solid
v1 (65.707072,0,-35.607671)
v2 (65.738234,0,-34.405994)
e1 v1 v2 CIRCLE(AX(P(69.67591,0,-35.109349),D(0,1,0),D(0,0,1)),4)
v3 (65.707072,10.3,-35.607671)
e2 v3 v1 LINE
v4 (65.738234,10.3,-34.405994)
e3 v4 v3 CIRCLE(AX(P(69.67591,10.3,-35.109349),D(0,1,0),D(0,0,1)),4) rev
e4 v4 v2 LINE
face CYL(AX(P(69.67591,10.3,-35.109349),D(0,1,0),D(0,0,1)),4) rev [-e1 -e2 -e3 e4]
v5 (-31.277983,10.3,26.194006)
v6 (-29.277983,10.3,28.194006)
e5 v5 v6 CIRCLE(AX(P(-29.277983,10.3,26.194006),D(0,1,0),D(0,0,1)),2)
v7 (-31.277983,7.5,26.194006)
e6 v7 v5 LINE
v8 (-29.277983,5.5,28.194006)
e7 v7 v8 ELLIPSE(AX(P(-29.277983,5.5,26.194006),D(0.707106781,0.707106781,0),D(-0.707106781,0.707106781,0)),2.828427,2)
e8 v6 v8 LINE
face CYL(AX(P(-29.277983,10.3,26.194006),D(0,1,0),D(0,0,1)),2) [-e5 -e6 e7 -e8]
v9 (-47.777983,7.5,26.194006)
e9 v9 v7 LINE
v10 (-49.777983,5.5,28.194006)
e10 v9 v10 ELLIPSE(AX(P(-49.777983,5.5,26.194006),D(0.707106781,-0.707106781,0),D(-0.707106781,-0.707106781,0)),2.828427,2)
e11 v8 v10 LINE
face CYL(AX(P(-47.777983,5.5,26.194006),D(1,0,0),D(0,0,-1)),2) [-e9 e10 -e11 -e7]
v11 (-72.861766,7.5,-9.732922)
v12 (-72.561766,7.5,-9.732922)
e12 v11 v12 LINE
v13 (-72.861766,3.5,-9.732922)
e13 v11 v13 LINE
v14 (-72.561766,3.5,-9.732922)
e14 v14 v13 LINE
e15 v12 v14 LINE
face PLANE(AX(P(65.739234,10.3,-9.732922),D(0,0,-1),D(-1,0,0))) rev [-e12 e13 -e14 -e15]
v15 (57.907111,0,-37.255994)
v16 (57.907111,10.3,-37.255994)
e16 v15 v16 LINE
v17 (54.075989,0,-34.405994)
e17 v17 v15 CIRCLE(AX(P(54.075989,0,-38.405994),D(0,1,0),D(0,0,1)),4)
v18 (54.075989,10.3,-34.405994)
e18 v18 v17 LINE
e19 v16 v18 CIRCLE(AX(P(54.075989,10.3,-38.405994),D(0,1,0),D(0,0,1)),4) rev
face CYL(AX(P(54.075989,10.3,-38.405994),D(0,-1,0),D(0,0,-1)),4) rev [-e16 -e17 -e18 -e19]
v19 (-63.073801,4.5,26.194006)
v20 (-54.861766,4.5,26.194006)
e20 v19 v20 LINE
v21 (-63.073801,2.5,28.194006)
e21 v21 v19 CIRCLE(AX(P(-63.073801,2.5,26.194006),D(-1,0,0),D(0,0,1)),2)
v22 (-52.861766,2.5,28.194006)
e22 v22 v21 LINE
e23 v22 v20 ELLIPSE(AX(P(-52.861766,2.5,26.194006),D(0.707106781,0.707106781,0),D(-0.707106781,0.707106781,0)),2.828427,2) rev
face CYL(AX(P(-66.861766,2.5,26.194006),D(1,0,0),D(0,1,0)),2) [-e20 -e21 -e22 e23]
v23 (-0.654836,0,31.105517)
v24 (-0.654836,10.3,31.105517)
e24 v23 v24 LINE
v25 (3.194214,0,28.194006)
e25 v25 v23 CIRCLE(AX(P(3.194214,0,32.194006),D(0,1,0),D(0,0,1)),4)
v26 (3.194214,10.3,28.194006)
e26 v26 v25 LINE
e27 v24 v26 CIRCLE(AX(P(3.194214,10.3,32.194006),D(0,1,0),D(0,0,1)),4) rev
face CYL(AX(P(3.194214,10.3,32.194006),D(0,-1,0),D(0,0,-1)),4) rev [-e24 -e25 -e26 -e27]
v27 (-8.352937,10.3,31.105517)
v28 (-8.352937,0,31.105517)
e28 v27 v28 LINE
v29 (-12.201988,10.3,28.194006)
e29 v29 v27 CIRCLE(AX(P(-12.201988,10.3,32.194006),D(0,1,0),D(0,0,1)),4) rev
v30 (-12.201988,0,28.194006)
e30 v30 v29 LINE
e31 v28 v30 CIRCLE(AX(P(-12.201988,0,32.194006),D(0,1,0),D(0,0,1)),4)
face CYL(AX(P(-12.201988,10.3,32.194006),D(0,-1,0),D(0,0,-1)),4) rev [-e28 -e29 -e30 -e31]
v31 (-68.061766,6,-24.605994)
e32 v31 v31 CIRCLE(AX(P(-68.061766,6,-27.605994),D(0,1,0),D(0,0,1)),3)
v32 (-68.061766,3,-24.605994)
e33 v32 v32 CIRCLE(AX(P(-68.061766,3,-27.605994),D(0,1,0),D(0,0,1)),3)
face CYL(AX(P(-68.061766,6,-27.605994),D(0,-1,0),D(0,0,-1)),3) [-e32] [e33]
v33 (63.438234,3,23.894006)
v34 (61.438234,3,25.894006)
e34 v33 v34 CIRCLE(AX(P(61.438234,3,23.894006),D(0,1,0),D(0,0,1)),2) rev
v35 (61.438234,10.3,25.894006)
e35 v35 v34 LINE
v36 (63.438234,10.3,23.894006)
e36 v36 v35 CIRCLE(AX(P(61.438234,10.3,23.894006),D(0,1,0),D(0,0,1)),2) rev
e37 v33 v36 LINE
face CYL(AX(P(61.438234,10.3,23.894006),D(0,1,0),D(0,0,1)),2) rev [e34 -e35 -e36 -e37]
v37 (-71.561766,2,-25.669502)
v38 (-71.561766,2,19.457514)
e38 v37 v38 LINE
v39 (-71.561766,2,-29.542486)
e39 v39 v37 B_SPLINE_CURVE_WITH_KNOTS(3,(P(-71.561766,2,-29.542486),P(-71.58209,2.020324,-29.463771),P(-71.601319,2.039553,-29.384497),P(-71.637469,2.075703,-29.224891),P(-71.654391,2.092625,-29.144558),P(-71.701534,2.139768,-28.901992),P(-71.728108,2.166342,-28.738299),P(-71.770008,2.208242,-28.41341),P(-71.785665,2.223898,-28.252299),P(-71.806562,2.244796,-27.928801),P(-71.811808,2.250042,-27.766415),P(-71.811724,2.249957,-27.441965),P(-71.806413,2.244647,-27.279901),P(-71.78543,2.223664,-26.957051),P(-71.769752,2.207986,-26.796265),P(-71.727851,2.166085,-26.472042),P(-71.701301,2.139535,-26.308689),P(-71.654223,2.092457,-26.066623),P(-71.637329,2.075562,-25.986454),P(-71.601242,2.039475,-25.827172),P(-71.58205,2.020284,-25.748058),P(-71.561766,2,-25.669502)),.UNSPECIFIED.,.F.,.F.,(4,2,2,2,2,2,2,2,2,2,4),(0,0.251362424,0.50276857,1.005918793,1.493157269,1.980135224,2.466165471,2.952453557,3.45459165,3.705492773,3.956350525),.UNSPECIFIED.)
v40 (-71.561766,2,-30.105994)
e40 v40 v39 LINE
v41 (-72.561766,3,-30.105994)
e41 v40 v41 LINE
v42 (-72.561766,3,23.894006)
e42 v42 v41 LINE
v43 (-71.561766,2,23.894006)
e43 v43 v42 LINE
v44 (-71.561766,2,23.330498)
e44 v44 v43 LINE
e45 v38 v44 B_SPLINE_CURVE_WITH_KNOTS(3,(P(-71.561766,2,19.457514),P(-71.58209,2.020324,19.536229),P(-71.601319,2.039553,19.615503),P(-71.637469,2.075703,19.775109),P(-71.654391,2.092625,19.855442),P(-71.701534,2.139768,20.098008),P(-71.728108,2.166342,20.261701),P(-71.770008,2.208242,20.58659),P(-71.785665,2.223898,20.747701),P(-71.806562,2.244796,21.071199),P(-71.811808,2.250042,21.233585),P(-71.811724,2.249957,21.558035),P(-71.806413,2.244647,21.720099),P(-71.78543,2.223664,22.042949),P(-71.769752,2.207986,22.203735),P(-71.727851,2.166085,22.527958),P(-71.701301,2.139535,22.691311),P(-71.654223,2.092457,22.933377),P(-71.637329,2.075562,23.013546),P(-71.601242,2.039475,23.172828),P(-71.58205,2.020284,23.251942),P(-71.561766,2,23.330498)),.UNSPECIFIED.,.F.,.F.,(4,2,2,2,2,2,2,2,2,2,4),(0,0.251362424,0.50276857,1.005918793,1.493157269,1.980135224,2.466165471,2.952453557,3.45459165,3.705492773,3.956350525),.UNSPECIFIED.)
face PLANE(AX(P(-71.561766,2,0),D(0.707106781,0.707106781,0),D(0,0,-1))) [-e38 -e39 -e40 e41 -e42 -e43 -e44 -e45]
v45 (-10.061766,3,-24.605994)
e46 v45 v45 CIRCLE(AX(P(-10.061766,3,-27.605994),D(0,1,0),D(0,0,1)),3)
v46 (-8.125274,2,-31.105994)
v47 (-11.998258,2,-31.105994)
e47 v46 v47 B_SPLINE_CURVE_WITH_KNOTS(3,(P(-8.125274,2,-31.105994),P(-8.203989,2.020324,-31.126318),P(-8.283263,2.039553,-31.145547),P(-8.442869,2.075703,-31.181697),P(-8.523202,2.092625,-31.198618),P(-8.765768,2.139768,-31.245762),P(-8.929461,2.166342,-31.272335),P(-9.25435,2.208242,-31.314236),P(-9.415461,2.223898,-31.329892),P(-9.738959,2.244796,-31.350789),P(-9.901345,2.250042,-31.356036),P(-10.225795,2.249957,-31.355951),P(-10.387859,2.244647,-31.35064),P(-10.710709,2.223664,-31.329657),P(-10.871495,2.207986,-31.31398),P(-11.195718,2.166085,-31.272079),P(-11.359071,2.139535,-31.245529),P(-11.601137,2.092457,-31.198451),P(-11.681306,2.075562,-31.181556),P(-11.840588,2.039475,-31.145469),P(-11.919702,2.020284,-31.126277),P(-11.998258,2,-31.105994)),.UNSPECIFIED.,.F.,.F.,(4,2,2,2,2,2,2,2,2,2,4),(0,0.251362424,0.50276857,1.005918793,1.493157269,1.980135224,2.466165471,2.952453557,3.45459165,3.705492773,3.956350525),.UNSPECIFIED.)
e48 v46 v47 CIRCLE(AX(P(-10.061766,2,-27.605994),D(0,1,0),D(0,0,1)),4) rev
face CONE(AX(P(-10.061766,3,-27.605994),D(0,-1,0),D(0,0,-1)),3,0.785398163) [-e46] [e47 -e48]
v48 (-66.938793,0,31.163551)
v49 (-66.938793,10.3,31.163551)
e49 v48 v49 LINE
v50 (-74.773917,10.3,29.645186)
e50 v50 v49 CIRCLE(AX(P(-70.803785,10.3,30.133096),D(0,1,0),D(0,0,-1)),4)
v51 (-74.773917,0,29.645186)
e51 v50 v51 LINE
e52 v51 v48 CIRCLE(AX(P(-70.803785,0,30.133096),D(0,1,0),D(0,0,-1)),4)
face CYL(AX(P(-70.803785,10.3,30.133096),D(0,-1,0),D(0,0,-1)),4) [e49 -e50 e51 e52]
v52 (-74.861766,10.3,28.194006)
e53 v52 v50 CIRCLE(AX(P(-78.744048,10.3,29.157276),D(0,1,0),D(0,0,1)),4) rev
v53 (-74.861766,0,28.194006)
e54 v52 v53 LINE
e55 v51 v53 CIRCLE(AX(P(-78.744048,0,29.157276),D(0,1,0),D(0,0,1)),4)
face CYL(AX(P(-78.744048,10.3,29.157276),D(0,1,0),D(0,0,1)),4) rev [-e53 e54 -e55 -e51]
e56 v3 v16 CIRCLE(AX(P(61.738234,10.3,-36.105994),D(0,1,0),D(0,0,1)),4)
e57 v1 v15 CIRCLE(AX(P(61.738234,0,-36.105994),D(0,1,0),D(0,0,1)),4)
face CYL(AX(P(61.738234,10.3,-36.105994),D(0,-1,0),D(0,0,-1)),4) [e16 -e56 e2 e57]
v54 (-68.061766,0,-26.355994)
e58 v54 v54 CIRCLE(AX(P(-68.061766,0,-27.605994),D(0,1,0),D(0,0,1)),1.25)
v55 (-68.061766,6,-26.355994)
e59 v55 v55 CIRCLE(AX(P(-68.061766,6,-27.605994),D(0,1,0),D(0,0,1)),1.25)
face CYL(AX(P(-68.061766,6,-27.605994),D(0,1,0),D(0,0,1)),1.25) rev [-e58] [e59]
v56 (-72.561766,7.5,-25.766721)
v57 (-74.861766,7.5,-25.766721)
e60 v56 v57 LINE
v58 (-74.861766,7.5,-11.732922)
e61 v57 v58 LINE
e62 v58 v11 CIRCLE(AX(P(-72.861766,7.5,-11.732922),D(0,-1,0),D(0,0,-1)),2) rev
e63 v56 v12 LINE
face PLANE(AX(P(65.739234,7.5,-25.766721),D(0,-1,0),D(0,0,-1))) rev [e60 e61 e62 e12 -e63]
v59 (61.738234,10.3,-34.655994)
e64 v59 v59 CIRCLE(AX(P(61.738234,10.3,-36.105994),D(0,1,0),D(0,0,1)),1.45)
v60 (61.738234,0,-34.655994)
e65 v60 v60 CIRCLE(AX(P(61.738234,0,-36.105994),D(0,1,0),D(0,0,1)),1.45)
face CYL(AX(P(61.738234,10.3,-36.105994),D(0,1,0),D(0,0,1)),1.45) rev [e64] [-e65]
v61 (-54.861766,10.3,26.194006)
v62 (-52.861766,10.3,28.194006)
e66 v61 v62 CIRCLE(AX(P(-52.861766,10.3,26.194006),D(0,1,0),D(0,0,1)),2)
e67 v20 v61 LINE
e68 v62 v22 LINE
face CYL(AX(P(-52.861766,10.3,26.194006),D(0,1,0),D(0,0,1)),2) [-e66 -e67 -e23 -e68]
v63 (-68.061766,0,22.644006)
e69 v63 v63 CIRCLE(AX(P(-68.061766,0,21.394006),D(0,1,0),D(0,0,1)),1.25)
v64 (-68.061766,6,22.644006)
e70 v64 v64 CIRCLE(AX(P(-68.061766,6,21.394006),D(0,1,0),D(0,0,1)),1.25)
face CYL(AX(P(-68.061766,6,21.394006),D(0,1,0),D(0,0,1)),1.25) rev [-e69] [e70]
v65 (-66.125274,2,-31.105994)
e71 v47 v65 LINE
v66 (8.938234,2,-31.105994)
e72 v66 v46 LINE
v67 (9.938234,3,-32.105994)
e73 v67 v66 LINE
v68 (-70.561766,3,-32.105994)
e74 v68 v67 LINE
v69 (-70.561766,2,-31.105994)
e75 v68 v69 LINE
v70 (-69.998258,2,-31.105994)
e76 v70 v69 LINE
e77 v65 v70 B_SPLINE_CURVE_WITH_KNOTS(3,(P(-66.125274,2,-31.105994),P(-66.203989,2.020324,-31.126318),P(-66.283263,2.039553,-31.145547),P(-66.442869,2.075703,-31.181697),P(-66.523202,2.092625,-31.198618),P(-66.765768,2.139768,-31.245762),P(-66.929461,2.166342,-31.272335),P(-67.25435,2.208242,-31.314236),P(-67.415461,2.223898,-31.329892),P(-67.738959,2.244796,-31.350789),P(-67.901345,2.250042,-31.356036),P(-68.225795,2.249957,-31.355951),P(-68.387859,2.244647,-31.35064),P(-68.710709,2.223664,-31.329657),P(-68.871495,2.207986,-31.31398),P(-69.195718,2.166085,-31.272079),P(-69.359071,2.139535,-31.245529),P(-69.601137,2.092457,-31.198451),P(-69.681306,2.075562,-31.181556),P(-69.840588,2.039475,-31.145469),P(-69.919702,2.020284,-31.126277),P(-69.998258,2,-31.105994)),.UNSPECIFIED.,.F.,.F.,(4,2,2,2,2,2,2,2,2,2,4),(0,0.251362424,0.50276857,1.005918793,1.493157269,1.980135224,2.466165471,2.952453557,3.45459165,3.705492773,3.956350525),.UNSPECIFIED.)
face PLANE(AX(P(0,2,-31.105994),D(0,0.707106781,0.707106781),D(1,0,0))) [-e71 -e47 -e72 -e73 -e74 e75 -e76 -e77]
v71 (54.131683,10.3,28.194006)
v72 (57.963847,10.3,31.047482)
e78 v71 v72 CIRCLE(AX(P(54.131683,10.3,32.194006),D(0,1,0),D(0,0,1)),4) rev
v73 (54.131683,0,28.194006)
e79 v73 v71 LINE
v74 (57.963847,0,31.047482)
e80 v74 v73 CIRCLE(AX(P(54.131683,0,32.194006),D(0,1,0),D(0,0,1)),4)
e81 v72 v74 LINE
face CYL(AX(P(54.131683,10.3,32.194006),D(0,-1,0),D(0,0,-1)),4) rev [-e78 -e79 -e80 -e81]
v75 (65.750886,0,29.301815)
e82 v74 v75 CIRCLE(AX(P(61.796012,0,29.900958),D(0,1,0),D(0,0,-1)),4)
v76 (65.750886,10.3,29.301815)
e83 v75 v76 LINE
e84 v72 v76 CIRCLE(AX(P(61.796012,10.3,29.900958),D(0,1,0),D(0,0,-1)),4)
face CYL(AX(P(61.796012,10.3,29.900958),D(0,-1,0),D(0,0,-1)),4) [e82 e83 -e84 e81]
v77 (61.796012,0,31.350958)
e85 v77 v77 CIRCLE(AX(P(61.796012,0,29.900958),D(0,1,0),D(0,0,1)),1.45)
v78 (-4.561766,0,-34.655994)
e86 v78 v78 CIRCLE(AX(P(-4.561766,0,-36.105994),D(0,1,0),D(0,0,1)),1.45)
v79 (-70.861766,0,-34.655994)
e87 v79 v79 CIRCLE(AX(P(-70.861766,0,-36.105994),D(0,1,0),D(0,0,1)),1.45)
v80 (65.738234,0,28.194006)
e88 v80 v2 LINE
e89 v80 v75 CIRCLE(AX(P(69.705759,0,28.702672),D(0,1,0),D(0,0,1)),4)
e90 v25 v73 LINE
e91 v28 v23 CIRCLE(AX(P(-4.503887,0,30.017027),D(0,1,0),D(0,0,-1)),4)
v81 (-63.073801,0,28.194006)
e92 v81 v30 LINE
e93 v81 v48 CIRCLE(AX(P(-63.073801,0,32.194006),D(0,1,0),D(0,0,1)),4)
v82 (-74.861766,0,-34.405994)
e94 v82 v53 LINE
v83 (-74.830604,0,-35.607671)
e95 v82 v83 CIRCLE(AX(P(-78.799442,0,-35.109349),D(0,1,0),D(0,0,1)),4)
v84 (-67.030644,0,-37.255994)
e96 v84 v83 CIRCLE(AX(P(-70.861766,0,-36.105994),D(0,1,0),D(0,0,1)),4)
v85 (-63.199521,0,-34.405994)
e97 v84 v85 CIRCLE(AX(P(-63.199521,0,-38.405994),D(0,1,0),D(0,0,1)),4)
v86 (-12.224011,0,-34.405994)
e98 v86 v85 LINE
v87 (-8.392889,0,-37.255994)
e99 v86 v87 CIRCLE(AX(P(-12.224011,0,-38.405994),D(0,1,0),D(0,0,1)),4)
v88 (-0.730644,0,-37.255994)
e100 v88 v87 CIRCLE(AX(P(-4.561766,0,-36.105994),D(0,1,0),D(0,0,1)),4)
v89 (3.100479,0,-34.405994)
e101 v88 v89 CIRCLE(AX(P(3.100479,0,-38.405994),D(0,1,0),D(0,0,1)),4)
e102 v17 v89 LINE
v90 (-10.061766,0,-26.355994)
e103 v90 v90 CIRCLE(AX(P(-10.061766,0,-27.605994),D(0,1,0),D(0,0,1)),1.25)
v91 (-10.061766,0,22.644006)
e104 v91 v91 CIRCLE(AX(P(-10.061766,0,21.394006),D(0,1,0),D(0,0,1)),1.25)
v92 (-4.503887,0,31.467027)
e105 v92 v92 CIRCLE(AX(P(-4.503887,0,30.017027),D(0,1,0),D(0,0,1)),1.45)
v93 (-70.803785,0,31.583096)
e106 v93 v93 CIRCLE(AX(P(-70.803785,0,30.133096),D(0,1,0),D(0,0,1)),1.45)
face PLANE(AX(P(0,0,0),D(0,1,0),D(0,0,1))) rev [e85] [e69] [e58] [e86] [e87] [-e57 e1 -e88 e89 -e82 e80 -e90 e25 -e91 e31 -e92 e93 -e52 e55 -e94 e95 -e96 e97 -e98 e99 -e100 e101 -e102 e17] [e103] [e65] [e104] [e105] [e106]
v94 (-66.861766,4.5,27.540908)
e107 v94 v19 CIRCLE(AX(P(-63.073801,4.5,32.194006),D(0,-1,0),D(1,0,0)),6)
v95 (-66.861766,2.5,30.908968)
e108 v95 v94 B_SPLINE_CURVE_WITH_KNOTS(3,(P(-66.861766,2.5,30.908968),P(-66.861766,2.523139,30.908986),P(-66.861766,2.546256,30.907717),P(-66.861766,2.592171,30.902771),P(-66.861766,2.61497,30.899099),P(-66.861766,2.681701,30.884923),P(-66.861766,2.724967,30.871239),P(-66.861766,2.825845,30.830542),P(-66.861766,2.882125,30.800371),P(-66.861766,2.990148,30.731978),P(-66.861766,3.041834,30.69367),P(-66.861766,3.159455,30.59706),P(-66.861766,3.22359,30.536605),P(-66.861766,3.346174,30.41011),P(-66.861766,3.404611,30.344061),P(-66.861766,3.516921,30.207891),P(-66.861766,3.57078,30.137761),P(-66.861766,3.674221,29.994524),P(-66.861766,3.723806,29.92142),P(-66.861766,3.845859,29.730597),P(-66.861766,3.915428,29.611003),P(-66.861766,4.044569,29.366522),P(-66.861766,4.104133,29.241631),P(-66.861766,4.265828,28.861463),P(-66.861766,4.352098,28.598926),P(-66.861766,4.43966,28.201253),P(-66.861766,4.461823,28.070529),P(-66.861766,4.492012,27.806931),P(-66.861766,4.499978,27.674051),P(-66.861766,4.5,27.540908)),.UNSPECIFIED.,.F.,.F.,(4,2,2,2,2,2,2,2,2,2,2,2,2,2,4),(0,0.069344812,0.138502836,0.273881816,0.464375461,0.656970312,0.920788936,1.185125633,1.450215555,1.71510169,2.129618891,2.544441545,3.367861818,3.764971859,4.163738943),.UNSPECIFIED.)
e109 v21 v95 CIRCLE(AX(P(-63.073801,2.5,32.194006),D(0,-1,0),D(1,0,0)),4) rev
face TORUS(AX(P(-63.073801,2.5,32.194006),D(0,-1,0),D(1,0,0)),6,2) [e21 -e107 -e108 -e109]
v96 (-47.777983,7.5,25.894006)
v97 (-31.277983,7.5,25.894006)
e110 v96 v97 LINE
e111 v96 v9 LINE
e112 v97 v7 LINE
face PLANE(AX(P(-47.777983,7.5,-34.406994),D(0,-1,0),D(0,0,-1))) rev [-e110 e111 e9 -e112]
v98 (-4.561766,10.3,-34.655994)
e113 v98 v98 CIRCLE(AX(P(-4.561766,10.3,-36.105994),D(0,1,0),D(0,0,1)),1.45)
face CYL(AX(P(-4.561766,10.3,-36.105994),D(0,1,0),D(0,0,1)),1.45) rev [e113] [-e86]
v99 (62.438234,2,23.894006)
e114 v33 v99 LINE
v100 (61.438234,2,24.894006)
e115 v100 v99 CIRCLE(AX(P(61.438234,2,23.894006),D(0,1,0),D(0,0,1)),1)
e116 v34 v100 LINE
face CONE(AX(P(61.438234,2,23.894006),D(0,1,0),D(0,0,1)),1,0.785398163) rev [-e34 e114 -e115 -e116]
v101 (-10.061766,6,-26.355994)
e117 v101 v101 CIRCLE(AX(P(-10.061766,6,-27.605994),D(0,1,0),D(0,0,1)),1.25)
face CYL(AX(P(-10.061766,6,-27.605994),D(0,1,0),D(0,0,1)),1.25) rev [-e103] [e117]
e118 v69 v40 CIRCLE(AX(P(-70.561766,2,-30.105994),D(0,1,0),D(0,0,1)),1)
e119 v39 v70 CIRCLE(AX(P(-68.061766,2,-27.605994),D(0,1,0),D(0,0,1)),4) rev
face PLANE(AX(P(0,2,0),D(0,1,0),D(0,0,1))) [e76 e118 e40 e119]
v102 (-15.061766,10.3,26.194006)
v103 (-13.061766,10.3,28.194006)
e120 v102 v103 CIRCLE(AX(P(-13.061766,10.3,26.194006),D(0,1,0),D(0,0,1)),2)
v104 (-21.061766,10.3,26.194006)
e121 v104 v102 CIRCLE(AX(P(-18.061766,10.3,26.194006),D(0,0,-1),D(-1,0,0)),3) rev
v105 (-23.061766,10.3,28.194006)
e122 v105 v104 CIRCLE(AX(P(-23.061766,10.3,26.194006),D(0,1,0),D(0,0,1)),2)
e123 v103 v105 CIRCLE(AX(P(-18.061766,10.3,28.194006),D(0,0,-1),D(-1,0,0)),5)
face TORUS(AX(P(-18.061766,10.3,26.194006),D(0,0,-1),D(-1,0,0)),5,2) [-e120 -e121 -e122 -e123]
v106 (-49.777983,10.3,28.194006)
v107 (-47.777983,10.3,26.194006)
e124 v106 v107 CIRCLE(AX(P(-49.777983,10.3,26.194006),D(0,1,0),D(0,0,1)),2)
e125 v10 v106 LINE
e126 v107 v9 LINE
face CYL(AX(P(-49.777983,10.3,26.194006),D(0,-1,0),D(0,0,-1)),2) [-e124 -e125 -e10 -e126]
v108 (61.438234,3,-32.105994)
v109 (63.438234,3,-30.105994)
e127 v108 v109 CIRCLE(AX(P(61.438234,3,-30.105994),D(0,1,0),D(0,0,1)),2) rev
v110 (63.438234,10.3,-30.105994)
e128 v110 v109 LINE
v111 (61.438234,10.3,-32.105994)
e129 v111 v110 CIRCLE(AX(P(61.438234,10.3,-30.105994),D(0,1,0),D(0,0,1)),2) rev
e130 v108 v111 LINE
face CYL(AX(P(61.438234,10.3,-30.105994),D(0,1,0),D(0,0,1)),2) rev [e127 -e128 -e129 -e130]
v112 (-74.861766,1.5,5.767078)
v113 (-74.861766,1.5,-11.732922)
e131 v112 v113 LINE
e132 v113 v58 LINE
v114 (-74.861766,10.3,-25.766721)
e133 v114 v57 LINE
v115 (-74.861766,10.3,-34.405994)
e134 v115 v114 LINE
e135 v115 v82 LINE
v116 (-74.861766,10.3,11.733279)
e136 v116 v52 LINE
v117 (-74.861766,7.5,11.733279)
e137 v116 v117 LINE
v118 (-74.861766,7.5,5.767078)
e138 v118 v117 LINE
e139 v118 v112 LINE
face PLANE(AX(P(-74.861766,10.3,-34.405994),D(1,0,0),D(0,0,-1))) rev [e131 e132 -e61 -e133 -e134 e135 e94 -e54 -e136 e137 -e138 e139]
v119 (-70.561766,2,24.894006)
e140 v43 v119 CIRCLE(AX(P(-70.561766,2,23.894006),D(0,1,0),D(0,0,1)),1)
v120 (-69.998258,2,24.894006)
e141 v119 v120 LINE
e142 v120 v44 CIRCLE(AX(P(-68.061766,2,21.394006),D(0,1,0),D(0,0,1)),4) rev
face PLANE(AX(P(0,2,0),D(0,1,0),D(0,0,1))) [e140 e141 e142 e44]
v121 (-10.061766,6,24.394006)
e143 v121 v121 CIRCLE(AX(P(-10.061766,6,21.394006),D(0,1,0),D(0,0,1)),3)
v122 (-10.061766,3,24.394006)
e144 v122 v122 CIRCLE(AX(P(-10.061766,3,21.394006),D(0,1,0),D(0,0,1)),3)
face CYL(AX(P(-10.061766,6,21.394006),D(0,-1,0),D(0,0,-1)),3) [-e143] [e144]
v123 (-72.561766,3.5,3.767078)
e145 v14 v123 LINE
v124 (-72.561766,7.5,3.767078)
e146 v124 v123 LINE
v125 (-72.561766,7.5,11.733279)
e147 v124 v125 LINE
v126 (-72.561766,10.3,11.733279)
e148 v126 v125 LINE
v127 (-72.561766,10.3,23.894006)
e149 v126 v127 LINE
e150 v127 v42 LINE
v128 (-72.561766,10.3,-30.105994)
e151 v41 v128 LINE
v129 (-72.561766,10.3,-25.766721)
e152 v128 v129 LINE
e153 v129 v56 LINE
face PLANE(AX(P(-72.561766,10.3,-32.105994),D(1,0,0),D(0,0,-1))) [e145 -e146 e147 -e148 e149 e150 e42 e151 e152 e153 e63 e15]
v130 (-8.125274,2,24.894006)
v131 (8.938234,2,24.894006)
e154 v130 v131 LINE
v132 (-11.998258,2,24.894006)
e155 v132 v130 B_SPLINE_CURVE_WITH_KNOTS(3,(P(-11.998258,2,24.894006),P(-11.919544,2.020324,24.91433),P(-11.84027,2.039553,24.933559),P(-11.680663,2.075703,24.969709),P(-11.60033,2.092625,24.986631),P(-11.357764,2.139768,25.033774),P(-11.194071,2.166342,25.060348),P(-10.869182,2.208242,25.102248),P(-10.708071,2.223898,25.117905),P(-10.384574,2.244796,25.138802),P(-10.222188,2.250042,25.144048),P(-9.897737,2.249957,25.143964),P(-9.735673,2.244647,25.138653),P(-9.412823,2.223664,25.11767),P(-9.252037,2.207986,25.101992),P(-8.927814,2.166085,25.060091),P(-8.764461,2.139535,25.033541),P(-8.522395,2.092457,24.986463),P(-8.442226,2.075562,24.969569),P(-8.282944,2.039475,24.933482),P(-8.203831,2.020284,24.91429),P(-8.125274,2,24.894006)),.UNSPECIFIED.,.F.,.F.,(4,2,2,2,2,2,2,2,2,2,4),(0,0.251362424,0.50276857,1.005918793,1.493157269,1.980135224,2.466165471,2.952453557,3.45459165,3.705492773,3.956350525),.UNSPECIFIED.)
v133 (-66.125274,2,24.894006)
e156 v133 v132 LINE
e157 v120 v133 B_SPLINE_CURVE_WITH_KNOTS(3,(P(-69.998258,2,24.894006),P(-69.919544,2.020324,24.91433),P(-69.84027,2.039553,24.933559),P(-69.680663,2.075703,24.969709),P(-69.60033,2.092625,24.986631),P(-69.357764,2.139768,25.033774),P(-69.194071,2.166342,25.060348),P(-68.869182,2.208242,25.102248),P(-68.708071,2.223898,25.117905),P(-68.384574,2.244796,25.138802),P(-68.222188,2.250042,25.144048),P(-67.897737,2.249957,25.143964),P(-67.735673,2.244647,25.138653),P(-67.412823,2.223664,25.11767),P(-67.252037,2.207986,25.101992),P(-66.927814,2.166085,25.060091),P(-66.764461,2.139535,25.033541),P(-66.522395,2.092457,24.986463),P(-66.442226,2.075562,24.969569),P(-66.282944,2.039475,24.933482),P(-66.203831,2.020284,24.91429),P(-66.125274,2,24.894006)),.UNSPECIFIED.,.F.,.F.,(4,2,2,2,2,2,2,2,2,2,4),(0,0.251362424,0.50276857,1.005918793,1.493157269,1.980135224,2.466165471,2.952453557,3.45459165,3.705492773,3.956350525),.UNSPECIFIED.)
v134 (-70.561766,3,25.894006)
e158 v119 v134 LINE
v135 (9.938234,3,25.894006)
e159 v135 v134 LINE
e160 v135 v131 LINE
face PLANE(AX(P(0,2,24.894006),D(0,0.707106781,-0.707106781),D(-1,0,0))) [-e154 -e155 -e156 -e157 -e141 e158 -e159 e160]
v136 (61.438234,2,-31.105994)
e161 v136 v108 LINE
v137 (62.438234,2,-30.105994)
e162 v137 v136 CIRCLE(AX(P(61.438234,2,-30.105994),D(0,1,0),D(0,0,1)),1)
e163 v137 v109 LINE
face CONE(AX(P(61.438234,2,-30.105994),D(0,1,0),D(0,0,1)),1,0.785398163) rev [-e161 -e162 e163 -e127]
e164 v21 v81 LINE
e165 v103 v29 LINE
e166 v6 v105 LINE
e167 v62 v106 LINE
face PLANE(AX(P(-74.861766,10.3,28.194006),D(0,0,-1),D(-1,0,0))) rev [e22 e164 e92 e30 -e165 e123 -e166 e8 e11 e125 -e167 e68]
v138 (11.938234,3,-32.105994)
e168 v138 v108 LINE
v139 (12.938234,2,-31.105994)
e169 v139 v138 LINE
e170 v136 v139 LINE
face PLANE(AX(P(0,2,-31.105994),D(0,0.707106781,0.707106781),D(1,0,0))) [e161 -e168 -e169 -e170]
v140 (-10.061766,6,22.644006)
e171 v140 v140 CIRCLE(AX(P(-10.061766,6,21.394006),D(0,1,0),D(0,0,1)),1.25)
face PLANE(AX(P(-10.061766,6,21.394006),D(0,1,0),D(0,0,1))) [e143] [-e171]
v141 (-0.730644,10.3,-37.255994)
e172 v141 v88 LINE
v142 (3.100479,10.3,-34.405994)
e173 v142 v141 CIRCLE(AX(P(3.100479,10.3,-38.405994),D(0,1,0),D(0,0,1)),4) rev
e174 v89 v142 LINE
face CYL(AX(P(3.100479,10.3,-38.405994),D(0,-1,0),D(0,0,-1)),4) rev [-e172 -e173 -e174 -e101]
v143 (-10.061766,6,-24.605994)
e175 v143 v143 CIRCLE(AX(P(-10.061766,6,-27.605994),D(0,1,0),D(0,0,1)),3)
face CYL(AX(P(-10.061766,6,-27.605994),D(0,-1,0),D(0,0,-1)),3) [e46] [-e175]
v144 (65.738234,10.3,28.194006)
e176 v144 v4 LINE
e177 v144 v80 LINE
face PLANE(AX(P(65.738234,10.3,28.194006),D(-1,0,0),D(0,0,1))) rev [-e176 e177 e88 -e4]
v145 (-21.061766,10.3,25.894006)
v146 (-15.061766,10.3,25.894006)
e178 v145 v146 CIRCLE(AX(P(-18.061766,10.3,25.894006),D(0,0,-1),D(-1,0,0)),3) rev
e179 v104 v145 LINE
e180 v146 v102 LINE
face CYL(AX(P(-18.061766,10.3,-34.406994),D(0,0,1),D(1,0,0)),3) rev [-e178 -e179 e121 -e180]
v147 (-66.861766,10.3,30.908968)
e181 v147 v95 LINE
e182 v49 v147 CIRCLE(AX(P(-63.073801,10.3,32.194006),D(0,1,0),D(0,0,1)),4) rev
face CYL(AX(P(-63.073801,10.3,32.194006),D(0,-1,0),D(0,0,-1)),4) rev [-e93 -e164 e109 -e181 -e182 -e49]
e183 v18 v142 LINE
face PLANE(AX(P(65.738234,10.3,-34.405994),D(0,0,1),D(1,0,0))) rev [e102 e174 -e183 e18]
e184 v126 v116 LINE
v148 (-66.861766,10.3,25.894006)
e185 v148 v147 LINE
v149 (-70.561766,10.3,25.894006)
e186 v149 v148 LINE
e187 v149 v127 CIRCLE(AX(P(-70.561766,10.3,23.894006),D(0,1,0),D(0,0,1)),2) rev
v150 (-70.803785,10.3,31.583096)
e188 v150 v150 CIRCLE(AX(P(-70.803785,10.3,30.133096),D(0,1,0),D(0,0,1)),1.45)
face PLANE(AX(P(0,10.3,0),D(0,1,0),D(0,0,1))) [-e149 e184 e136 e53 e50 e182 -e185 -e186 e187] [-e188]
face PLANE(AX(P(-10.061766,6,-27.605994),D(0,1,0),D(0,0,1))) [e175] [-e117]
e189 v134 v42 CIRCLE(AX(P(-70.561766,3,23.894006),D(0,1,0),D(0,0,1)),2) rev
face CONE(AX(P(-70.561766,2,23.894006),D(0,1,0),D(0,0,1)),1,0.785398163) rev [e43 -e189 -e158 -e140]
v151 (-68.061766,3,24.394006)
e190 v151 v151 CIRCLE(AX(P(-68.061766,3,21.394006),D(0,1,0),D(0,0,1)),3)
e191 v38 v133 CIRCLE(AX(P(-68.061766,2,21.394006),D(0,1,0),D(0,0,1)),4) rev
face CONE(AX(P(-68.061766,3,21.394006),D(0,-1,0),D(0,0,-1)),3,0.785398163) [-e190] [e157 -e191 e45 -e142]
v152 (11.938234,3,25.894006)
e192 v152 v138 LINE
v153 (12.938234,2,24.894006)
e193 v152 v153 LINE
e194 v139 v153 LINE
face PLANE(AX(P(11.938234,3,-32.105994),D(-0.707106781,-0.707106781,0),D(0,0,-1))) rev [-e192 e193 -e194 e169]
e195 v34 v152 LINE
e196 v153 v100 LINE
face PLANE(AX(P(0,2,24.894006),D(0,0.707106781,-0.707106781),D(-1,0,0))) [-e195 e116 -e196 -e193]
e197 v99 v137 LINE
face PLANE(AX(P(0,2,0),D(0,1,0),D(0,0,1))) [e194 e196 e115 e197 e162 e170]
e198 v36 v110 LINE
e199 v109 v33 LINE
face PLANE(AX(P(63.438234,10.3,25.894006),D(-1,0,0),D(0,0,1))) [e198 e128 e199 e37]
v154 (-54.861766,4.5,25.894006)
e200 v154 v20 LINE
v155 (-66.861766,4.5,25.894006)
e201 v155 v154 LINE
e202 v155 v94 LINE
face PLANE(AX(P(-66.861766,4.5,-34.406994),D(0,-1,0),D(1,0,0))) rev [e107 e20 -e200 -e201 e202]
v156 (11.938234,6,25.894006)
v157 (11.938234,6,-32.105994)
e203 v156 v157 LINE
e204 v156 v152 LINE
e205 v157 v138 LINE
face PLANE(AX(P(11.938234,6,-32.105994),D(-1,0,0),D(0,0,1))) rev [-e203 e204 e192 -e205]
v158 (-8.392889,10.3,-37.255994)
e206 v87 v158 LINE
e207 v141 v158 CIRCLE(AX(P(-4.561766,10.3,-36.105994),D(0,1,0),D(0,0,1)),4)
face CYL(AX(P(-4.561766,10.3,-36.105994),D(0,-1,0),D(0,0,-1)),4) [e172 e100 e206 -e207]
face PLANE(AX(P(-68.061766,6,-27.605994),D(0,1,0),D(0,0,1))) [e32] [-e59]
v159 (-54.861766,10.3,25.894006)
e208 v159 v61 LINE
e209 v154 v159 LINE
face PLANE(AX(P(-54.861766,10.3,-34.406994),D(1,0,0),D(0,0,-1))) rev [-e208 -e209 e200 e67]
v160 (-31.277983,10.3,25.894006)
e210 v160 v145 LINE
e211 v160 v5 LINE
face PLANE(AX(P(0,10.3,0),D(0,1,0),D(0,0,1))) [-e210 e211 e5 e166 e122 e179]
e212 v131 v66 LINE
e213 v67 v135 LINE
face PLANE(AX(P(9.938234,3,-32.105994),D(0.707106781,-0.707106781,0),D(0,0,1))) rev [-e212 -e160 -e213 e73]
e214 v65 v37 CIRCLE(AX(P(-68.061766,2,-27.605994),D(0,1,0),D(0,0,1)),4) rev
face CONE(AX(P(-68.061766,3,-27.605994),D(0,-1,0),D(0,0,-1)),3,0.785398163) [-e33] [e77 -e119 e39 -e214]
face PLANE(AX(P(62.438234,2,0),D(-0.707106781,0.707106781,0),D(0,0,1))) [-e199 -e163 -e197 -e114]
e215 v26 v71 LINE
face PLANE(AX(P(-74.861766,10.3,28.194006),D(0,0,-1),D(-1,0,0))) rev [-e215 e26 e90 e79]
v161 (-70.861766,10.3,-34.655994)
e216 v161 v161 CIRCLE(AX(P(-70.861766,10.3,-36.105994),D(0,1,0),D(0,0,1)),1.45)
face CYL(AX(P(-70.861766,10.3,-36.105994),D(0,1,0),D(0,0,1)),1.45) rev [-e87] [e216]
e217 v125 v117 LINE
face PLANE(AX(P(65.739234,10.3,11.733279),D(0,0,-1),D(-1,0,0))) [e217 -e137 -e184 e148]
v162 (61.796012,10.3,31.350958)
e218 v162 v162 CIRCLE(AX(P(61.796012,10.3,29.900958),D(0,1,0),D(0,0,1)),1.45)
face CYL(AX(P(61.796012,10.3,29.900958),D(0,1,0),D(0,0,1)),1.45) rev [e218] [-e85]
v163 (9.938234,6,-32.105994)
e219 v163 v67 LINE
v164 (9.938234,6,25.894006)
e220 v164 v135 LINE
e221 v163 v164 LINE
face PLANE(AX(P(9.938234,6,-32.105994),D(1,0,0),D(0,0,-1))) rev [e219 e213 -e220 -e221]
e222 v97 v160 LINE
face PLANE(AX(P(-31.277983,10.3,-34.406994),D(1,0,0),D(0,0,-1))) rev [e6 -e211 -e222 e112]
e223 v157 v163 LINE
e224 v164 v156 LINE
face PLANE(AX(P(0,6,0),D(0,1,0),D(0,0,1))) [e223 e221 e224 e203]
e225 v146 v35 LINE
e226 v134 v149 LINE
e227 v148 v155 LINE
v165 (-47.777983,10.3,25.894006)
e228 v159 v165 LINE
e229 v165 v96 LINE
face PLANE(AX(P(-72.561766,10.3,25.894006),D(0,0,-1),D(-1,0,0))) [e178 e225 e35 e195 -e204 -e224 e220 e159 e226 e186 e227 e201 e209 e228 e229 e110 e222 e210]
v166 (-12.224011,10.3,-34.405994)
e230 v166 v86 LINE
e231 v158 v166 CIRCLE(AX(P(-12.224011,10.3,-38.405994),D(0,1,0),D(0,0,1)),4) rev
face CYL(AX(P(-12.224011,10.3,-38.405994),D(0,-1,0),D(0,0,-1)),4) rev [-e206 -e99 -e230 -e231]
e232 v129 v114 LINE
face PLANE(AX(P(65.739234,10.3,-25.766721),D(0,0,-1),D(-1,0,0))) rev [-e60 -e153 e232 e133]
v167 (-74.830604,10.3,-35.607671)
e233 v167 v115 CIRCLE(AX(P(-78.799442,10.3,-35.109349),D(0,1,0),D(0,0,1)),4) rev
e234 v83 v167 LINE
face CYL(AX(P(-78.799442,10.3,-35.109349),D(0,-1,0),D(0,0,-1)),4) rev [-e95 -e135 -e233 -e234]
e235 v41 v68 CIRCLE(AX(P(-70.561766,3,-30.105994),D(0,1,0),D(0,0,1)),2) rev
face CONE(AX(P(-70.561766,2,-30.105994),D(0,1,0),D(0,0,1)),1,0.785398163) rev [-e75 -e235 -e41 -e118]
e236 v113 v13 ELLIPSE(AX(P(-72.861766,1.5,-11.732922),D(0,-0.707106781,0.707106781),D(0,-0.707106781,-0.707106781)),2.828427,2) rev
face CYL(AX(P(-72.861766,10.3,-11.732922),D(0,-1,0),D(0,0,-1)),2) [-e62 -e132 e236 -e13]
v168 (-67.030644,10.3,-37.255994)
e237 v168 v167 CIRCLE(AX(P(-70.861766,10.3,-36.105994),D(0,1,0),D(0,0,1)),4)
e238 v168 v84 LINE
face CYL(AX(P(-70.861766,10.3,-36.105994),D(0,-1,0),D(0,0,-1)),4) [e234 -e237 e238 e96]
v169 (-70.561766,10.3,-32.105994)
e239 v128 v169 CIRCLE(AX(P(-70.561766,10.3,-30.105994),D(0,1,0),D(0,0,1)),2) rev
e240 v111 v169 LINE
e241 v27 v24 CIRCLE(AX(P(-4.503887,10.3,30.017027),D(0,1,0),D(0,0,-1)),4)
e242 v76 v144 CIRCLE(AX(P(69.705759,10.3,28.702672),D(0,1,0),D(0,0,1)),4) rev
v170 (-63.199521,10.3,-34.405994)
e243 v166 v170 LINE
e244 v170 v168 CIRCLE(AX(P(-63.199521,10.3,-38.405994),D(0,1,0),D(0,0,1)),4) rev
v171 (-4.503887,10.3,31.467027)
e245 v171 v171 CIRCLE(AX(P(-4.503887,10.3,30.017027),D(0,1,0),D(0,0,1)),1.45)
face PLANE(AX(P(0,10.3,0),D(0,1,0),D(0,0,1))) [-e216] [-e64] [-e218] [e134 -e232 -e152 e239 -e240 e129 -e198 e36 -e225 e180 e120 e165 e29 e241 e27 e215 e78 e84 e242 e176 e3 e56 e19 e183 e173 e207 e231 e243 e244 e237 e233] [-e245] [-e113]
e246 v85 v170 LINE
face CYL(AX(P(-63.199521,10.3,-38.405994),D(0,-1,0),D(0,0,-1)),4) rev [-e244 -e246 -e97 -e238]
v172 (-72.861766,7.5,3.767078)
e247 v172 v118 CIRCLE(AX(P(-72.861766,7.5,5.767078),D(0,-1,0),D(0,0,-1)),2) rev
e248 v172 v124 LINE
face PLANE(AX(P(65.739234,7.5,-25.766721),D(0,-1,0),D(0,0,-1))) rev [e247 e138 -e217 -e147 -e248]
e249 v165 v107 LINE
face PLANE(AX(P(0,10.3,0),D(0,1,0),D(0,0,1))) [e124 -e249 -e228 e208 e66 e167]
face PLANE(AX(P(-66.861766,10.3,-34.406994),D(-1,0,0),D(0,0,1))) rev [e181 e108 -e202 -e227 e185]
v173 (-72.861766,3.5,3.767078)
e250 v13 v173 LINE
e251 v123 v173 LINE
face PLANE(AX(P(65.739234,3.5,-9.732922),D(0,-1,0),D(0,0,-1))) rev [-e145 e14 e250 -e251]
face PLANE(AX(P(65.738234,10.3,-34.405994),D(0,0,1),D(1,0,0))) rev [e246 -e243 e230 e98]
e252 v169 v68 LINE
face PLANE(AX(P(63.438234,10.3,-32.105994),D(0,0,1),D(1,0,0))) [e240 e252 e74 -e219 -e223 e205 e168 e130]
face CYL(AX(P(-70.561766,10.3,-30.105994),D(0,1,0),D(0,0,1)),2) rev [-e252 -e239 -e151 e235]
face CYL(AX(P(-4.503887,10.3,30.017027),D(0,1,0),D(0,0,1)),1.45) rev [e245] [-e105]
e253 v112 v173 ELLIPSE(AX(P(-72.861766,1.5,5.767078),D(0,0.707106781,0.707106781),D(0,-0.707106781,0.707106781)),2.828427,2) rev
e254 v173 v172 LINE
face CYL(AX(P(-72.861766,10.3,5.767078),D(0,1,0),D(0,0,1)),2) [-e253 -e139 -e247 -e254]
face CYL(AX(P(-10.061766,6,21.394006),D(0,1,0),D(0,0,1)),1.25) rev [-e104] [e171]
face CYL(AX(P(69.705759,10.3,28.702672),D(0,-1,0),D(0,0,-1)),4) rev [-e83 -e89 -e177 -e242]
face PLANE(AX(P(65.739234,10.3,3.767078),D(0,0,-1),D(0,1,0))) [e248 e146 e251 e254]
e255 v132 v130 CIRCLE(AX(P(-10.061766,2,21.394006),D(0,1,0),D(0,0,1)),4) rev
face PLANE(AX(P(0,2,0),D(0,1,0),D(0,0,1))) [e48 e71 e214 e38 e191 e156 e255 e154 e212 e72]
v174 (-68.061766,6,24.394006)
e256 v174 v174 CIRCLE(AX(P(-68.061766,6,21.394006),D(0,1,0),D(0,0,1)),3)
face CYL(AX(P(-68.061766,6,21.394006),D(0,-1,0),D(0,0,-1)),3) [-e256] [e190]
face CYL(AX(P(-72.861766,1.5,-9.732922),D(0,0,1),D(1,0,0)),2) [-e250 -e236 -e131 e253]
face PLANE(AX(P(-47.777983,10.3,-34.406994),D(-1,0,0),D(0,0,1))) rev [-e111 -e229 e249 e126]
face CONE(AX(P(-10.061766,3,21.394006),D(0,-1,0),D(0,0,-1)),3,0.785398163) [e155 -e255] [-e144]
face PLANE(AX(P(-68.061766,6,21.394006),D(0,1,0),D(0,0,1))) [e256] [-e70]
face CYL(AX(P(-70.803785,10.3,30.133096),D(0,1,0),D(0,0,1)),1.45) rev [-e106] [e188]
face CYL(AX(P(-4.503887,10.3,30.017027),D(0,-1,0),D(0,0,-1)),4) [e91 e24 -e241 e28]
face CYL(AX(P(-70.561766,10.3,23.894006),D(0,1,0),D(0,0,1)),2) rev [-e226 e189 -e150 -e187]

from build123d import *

# Parameters (mm, degrees)
SKETCH3_W                      = 140.6
SKETCH3_H                      = 62.6
SKETCH3_W_2                    = 136
SKETCH3_H_2                    = 58
BOSS_EXTRUDE1_DEPTH            = 10.3
SKETCH5_W                      = 136
SKETCH5_H                      = 58
BOSS_EXTRUDE2_DEPTH            = 2
SKETCH6_R                      = 3
BOSS_EXTRUDE3_DEPTH            = 4
F_2_5_2_5_DIAMETER_HOLE1_D     = 2.5
F_2_5_2_5_DIAMETER_HOLE1_DEPTH = 8
F_2_5_2_5_DIAMETER_HOLE1_TIP   = 0.751075774
SKETCH10_W                     = 2
SKETCH10_H                     = 58
BOSS_EXTRUDE4_DEPTH            = 4
CUT_EXTRUDE1_REACH             = 100.128
SKETCH11_R                     = 3
SKETCH11_W                     = 12
SKETCH11_H                     = 5.8
SKETCH11_W_2                   = 16.5
SKETCH11_H_2                   = 2.8
CUT_EXTRUDE2_REACH             = 147.115
SKETCH12_W                     = 13.5
SKETCH12_H                     = 6.8
SKETCH12_W_2                   = 37.5
SKETCH12_H_2                   = 2.8
SKETCH13_R                     = 4
BOSS_EXTRUDE5_DEPTH            = 10.3
FILLET2_R                      = 4
FILLET3_R                      = 4
FILLET4_R                      = 4
F_2_9_2_9_DIAMETER_HOLE1_D     = 2.9
FILLET6_R                      = 2
FILLET7_R                      = 2
FILLET8_R                      = 2
CHAMFER1_SIZE                  = 1
CHAMFER2_SIZE                  = 1
FILLET9_R                      = 2


with BuildPart() as part:
    # Sketch3 → Boss-Extrude1 (new body)
    with BuildSketch(Plane(origin=(0, 0, 0), x_dir=(1, 0, 0), z_dir=(0, 1, 0))):
        with Locations((-4.561766162, 3.105993834)):
            Rectangle(SKETCH3_W, SKETCH3_H)
        with Locations((-4.561766162, 3.105993834)):
            Rectangle(SKETCH3_W_2, SKETCH3_H_2, mode=Mode.SUBTRACT)
    extrude(amount=BOSS_EXTRUDE1_DEPTH)

    # Sketch5 → Boss-Extrude2 (add)
    with BuildSketch(Plane(origin=(0, 0, 0), x_dir=(1, 0, 0), z_dir=(0, 1, 0))):
        with Locations((-4.561766162, 3.105993834)):
            Rectangle(SKETCH5_W, SKETCH5_H)
    extrude(amount=BOSS_EXTRUDE2_DEPTH)

    # Sketch6 → Boss-Extrude3 (add)
    with BuildSketch(Plane(origin=(0, 2, 0), x_dir=(1, 0, 0), z_dir=(0, 1, 0))):
        with Locations(Location((-68.061766162, 27.605993834, 0), (0, 0, 270))):
            Circle(SKETCH6_R)
        with Locations(Location((-68.061766162, -21.394006166, 0), (0, 0, 270))):
            Circle(SKETCH6_R)
        with Locations(Location((-10.061766162, -21.394006166, 0), (0, 0, 270))):
            Circle(SKETCH6_R)
        with Locations(Location((-10.061766162, 27.605993834, 0), (0, 0, 270))):
            Circle(SKETCH6_R)
    extrude(amount=BOSS_EXTRUDE3_DEPTH)

    # Ø2.5 (2.5) Diameter Hole1
    with Locations(Plane(origin=(0, 6, 0), x_dir=(1, 0, 0), z_dir=(0, 1, 0))):
        with Locations((-68.061766162, 27.605993834), (-10.061766162, 27.605993834), (-10.061766162, -21.394006166), (-68.061766162, -21.394006166)):
            Hole(F_2_5_2_5_DIAMETER_HOLE1_D / 2, depth=F_2_5_2_5_DIAMETER_HOLE1_DEPTH)
            with Locations((0, 0, -(F_2_5_2_5_DIAMETER_HOLE1_DEPTH + F_2_5_2_5_DIAMETER_HOLE1_TIP / 2))):  # 118° drill point
                Cone(0, F_2_5_2_5_DIAMETER_HOLE1_D / 2, F_2_5_2_5_DIAMETER_HOLE1_TIP, mode=Mode.SUBTRACT)

    # Sketch10 → Boss-Extrude4 (add)
    with BuildSketch(Plane(origin=(0, 2, 0), x_dir=(1, 0, 0), z_dir=(0, 1, 0))):
        with Locations((10.938233838, 3.105993834)):
            Rectangle(SKETCH10_W, SKETCH10_H)
    extrude(amount=BOSS_EXTRUDE4_DEPTH)

    # Sketch11 → Cut-Extrude1 (cut, up to next)
    with BuildSketch(Plane.XY.offset(28.194006166), mode=Mode.PRIVATE) as cut_extrude1_sk1:
        with Locations((-18.061766162, 10.3)):
            Circle(SKETCH11_R)
    cut_extrude1_tool1 = extrude(cut_extrude1_sk1.sketch, amount=-CUT_EXTRUDE1_REACH, mode=Mode.PRIVATE) & part.part
    # Sketch11 → Cut-Extrude1 (cut, up to next)
    with BuildSketch(Plane.XY.offset(28.194006166), mode=Mode.PRIVATE) as cut_extrude1_sk2:
        with Locations((-60.861766162, 7.4)):
            Rectangle(SKETCH11_W, SKETCH11_H)
    cut_extrude1_tool2 = extrude(cut_extrude1_sk2.sketch, amount=-CUT_EXTRUDE1_REACH, mode=Mode.PRIVATE) & part.part
    # Sketch11 → Cut-Extrude1 (cut, up to next)
    with BuildSketch(Plane.XY.offset(28.194006166), mode=Mode.PRIVATE) as cut_extrude1_sk3:
        with Locations((-39.527982648, 8.9)):
            Rectangle(SKETCH11_W_2, SKETCH11_H_2)
    cut_extrude1_tool3 = extrude(cut_extrude1_sk3.sketch, amount=-CUT_EXTRUDE1_REACH, mode=Mode.PRIVATE) & part.part
    add(cut_extrude1_tool1.solids().sort_by_distance((-18.061766, 10.3, 28.194006))[0], mode=Mode.SUBTRACT)
    add(cut_extrude1_tool2.solids().sort_by_distance((-60.861766, 7.4, 28.194006))[0], mode=Mode.SUBTRACT)
    add(cut_extrude1_tool3.solids().sort_by_distance((-39.527983, 8.9, 28.194006))[0], mode=Mode.SUBTRACT)

    # Sketch12 → Cut-Extrude2 (cut, up to next)
    with BuildSketch(Plane.ZY.offset(74.861766162), mode=Mode.PRIVATE) as cut_extrude2_sk1:
        with Locations((-2.982922372, 6.9)):
            Rectangle(SKETCH12_W, SKETCH12_H)
    cut_extrude2_tool1 = extrude(cut_extrude2_sk1.sketch, amount=-CUT_EXTRUDE2_REACH, mode=Mode.PRIVATE) & part.part
    # Sketch12 → Cut-Extrude2 (cut, up to next)
    with BuildSketch(Plane.ZY.offset(74.861766162), mode=Mode.PRIVATE) as cut_extrude2_sk2:
        with Locations((-7.016720831, 8.9)):
            Rectangle(SKETCH12_W_2, SKETCH12_H_2)
    cut_extrude2_tool2 = extrude(cut_extrude2_sk2.sketch, amount=-CUT_EXTRUDE2_REACH, mode=Mode.PRIVATE) & part.part
    add(cut_extrude2_tool1.solids().sort_by_distance((-74.861766, 6.9, -2.982922))[0], mode=Mode.SUBTRACT)
    add(cut_extrude2_tool2.solids().sort_by_distance((-74.861766, 8.9, -7.016721))[0], mode=Mode.SUBTRACT)

    # Sketch13 → Boss-Extrude5 (add)
    with BuildSketch(Plane(origin=(0, 0, 0), x_dir=(1, 0, 0), z_dir=(0, 1, 0))):
        with Locations((-70.861766162, 36.105993834)):
            Circle(SKETCH13_R)
        with Locations((-4.561766162, 36.105993834)):
            Circle(SKETCH13_R)
        with Locations((61.738233838, 36.105993834)):
            Circle(SKETCH13_R)
        with Locations((61.796011733, -29.900958235)):
            Circle(SKETCH13_R)
        with Locations((-4.503886668, -30.017026964)):
            Circle(SKETCH13_R)
        with Locations((-70.80378507, -30.133095693)):
            Circle(SKETCH13_R)
    extrude(amount=BOSS_EXTRUDE5_DEPTH)

    # Fillet2
    # the kernel refuses this fillet: 4 mm, written as the material it adds along each edge
    with BuildSketch(Plane(origin=(-74.48253956, 10.3, -34.405993834), x_dir=(-1, 0, 0), z_dir=(0, -1, 0))) as fillet2_piece_1:
        with BuildLine():
            CenterArc((4.316902517, 0.703355094), FILLET2_R, 172.843462622, 17.284010607)
            Line((0.348064559, 1.201677547), (0.2686878, 1.211643996))
            ThreePointArc((0.2686878, 1.211643996), (0.144462277, 0.609403692), (-0.072415468, 0.034))
            Line((-0.072415468, 0.034), (0, -0.08))
            ThreePointArc((0, -0.08), (0.189613301, -0.08), (0.300473084, -0.014067102))
            Line((0.300473084, -0.014067102), (0.379226602, 0))
        make_face()
    extrude(amount=10.3)

    # Fillet3
    fillet3_edges = [part.edges().sort_by_distance(p)[0] for p in [
        (58.178510574, 5.15, 28.194006166),
        (-67.305223679, 5.15, 28.194006166),
        (-0.943466023, 5.15, 28.194006166),
        (-8.064307313, 5.15, 28.194006166),
        (58.11746044, 5.15, -34.405993834),
        (-8.18253956, 5.15, -34.405993834),
        (-0.940992764, 5.15, -34.405993834),
        (-67.240992764, 5.15, -34.405993834),
    ]]
    fillet(fillet3_edges, radius=FILLET3_R)

    # Fillet4
    # the kernel refuses this fillet: 4 mm, written as the material it adds along each edge
    with BuildSketch(Plane(origin=(-74.30234646, 10.3, 28.194006166), x_dir=(-0.3090485748086473, 0, 0.9510462546105442), z_dir=(0, -1, 0))) as fillet4_piece_1:
        with BuildLine():
            CenterArc((2.288815263, 3.926566562), FILLET4_R, 238.063311662, 20.941030322)
            Line((0.172887862, 0.532034012), (0, 0))
            ThreePointArc((0, 0), (0.762938421, 0.073433438), (1.525876842, 0))
        make_face()
    extrude(amount=10.3)
    with BuildSketch(Plane(origin=(65.413512892, 10.3, 28.194006166), x_dir=(0.29133036394129125, 0, 0.9566225060314203), z_dir=(0, -1, 0))) as fillet4_piece_2:
        with BuildLine():
            CenterArc((1.73706251, -3.957869992), FILLET4_R, 98.323104154, 15.92039244)
            Line((0.094601071, -0.310635365), (0, 0))
            ThreePointArc((0, 0), (0.579020837, -0.042130008), (1.158041673, 0))
        make_face()
    extrude(amount=10.3)
    with BuildSketch(Plane(origin=(65.359007236, 10.3, -34.405993834), x_dir=(1, 0, 0), z_dir=(0, -1, 0))) as fillet4_piece_3:
        with BuildLine():
            CenterArc((4.316902517, -0.703355094), FILLET4_R, 169.87252677, 17.284010607)
            ThreePointArc((0.348064559, -1.201677547), (0.221303822, -0.587146624), (0, 0))
            Line((0, 0), (0.379226602, 0))
        make_face()
    extrude(amount=10.3)

    # Ø2.9 (2.9) Diameter Hole1 (through all)
    with Locations(Plane(origin=(0, 10.3, 0), x_dir=(1, 0, 0), z_dir=(0, 1, 0))):
        with Locations((-70.861766162, 36.105993834), (-4.561766162, 36.105993834), (61.738233838, 36.105993834), (61.796011733, -29.900958235), (-4.503886668, -30.017026964), (-70.80378507, -30.133095693)):
            Hole(F_2_9_2_9_DIAMETER_HOLE1_D / 2)

    # Fillet6
    fillet6_edges = [part.edges().sort_by_distance(p)[0] for p in [
        (63.438233838, 6.15, -32.105993834),
    ]]
    fillet(fillet6_edges, radius=FILLET6_R)

    # Fillet7
    fillet7_edges = [part.edges().sort_by_distance(p)[0] for p in [
        (63.438233838, 6.15, 25.894006166),
    ]]
    fillet(fillet7_edges, radius=FILLET7_R)

    # Fillet8
    fillet8_edges = [part.edges().sort_by_distance(p)[0] for p in [
        (-72.561766162, 6.15, -32.105993834),
        (-72.561766162, 6.15, 25.894006166),
    ]]
    fillet(fillet8_edges, radius=FILLET8_R)

    # Chamfer1
    chamfer1_edges = [part.edges().sort_by_distance(p)[0] for p in [
        (-68.061766162, 2, -30.605993834),
        (-68.061766162, 2, 18.394006166),
        (-10.061766162, 2, 18.394006166),
        (-10.061766162, 2, -30.605993834),
    ]]
    chamfer(chamfer1_edges, length=CHAMFER1_SIZE)

    # Chamfer2
    # the kernel refuses this chamfer: 1 mm, written as the material it adds along each edge
    with BuildSketch(Plane(origin=(9.36655085, 2, -32.105993834), x_dir=(0, 0.9996219169112968, -0.027495876610589075), z_dir=(1, 0, 0)), Plane(origin=(61.438233838, 2, 25.894006166), x_dir=(0, 0.9996219169112968, 0.027495876610585623), z_dir=(-1, 0, 0))) as chamfer2_piece_1:
        Polygon((CHAMFER2_SIZE * 0.999621916911, CHAMFER2_SIZE * 0.0274958766106), (-CHAMFER2_SIZE * 0.0274958766106, CHAMFER2_SIZE * 0.999621916911), (0, 0), align=None)
    extrude(amount=52.071682988)
    with BuildSketch(Plane(origin=(61.438233838, 2, -30.105993834), x_dir=(1, 0, 0), z_dir=(0, 0, 1))) as chamfer2_piece_2:
        Polygon((2 - CHAMFER2_SIZE, 0), (2, CHAMFER2_SIZE), (2, 0), align=None)
    revolve(axis=Axis((61.438233838, 2, -30.105993834), (0, 1, 0)), revolution_arc=90)
    with BuildSketch(Plane(origin=(63.438233838, 2, -30.105993834), x_dir=(-0.9996219169112968, -0.02749587661058639, 0), z_dir=(0, 0, 1)), Plane(origin=(-72.561766162, 2, 23.894006166), x_dir=(0.9996219169112968, -0.027495876610586605, 0), z_dir=(0, 0, -1))) as chamfer2_piece_3:
        Polygon((CHAMFER2_SIZE * 0.999621916911, -CHAMFER2_SIZE * 0.0274958766106), (-CHAMFER2_SIZE * 0.0274958766106, -CHAMFER2_SIZE * 0.999621916911), (0, 0), align=None)
    extrude(amount=54)
    with BuildSketch(Plane(origin=(61.438233838, 2, 23.894006166), x_dir=(1, 0, 0), z_dir=(0, 0, -1))) as chamfer2_piece_4:
        Polygon((2 - CHAMFER2_SIZE, 0), (2, -CHAMFER2_SIZE), (2, 0), align=None)
    revolve(axis=Axis((61.438233838, 2, 23.894006166), (0, -1, 0)), revolution_arc=90)
    with BuildSketch(Plane(origin=(12.509916826, 2, 25.894006166), x_dir=(0, -0.027495876610586296, -0.9996219169112968), z_dir=(-1, 0, 0)), Plane(origin=(-70.561766162, 2, -32.105993834), x_dir=(0, -0.027495876610586296, 0.9996219169112968), z_dir=(1, 0, 0))) as chamfer2_piece_5:
        Polygon((CHAMFER2_SIZE * 0.999621916911, -CHAMFER2_SIZE * 0.0274958766106), (-CHAMFER2_SIZE * 0.0274958766106, -CHAMFER2_SIZE * 0.999621916911), (0, 0), align=None)
    extrude(amount=83.071682988)
    with BuildSketch(Plane(origin=(-70.561766162, 2, -30.105993834), x_dir=(0, 0, -1), z_dir=(1, 0, 0))) as chamfer2_piece_6:
        Polygon((2 - CHAMFER2_SIZE, 0), (2, CHAMFER2_SIZE), (2, 0), align=None)
    revolve(axis=Axis((-70.561766162, 2, -30.105993834), (0, 1, 0)), revolution_arc=90)
    with BuildSketch(Plane(origin=(-70.561766162, 2, 23.894006166), x_dir=(0, 0, 1), z_dir=(1, 0, 0))) as chamfer2_piece_7:
        Polygon((2 - CHAMFER2_SIZE, 0), (2, -CHAMFER2_SIZE), (2, 0), align=None)
    revolve(axis=Axis((-70.561766162, 2, 23.894006166), (0, -1, 0)), revolution_arc=90)
    with BuildSketch(Plane(origin=(9.938233838, 2, 28.465689154), x_dir=(-0.9996219169112968, -0.027495876610586296, 0), z_dir=(0, 0, -1))) as chamfer2_piece_8_section:
        Polygon((CHAMFER2_SIZE * 0.999621916911, CHAMFER2_SIZE * 0.0274958766106), (-CHAMFER2_SIZE * 0.0274958766106, CHAMFER2_SIZE * 0.999621916911), (0, 0), align=None)
    chamfer2_piece_8 = extrude(amount=63.143365976, mode=Mode.PRIVATE)
    chamfer2_piece_8 = split(chamfer2_piece_8, bisect_by=Plane(origin=(9.604900504, 2.333333333, 28.194006166), z_dir=(0, 0, -1)), keep=Keep.TOP, mode=Mode.PRIVATE)
    chamfer2_piece_8 = split(chamfer2_piece_8, bisect_by=Plane(origin=(9.604900504, 2.333333333, -34.405993834), z_dir=(0, 0, 1)), keep=Keep.TOP, mode=Mode.PRIVATE)
    add(chamfer2_piece_8)
    with BuildSketch(Plane(origin=(11.938233838, 2, -34.677676822), x_dir=(-0.027495876610585623, 0.9996219169112968, 0), z_dir=(0, 0, 1))) as chamfer2_piece_9_section:
        Polygon((CHAMFER2_SIZE * 0.999621916911, -CHAMFER2_SIZE * 0.0274958766106), (-CHAMFER2_SIZE * 0.0274958766106, -CHAMFER2_SIZE * 0.999621916911), (0, 0), align=None)
    chamfer2_piece_9 = extrude(amount=63.143365976, mode=Mode.PRIVATE)
    chamfer2_piece_9 = split(chamfer2_piece_9, bisect_by=Plane(origin=(12.271567171, 2.333333333, 28.194006166), z_dir=(0, 0, -1)), keep=Keep.TOP, mode=Mode.PRIVATE)
    chamfer2_piece_9 = split(chamfer2_piece_9, bisect_by=Plane(origin=(12.271567171, 2.333333333, -34.405993834), z_dir=(0, 0, 1)), keep=Keep.TOP, mode=Mode.PRIVATE)
    add(chamfer2_piece_9)

    # Fillet9
    fillet9_edges = [part.edges().sort_by_distance(p)[0] for p in [
        (-54.861766162, 7.4, 28.194006166),
        (-47.777982648, 8.9, 28.194006166),
        (-39.527982648, 7.5, 28.194006166),
        (-31.277982648, 8.9, 28.194006166),
        (-18.061766162, 7.3, 28.194006166),
        (-74.861766162, 5.5, -9.732922372),
        (-74.861766162, 3.5, -2.982922372),
        (-74.861766162, 5.5, 3.767077628),
        (-58.967783765, 4.5, 28.194006166),
        (-65.404021091, 4.5, 28.942840829),
    ]]
    fillet(fillet9_edges, radius=FILLET9_R)


solid = part.part
